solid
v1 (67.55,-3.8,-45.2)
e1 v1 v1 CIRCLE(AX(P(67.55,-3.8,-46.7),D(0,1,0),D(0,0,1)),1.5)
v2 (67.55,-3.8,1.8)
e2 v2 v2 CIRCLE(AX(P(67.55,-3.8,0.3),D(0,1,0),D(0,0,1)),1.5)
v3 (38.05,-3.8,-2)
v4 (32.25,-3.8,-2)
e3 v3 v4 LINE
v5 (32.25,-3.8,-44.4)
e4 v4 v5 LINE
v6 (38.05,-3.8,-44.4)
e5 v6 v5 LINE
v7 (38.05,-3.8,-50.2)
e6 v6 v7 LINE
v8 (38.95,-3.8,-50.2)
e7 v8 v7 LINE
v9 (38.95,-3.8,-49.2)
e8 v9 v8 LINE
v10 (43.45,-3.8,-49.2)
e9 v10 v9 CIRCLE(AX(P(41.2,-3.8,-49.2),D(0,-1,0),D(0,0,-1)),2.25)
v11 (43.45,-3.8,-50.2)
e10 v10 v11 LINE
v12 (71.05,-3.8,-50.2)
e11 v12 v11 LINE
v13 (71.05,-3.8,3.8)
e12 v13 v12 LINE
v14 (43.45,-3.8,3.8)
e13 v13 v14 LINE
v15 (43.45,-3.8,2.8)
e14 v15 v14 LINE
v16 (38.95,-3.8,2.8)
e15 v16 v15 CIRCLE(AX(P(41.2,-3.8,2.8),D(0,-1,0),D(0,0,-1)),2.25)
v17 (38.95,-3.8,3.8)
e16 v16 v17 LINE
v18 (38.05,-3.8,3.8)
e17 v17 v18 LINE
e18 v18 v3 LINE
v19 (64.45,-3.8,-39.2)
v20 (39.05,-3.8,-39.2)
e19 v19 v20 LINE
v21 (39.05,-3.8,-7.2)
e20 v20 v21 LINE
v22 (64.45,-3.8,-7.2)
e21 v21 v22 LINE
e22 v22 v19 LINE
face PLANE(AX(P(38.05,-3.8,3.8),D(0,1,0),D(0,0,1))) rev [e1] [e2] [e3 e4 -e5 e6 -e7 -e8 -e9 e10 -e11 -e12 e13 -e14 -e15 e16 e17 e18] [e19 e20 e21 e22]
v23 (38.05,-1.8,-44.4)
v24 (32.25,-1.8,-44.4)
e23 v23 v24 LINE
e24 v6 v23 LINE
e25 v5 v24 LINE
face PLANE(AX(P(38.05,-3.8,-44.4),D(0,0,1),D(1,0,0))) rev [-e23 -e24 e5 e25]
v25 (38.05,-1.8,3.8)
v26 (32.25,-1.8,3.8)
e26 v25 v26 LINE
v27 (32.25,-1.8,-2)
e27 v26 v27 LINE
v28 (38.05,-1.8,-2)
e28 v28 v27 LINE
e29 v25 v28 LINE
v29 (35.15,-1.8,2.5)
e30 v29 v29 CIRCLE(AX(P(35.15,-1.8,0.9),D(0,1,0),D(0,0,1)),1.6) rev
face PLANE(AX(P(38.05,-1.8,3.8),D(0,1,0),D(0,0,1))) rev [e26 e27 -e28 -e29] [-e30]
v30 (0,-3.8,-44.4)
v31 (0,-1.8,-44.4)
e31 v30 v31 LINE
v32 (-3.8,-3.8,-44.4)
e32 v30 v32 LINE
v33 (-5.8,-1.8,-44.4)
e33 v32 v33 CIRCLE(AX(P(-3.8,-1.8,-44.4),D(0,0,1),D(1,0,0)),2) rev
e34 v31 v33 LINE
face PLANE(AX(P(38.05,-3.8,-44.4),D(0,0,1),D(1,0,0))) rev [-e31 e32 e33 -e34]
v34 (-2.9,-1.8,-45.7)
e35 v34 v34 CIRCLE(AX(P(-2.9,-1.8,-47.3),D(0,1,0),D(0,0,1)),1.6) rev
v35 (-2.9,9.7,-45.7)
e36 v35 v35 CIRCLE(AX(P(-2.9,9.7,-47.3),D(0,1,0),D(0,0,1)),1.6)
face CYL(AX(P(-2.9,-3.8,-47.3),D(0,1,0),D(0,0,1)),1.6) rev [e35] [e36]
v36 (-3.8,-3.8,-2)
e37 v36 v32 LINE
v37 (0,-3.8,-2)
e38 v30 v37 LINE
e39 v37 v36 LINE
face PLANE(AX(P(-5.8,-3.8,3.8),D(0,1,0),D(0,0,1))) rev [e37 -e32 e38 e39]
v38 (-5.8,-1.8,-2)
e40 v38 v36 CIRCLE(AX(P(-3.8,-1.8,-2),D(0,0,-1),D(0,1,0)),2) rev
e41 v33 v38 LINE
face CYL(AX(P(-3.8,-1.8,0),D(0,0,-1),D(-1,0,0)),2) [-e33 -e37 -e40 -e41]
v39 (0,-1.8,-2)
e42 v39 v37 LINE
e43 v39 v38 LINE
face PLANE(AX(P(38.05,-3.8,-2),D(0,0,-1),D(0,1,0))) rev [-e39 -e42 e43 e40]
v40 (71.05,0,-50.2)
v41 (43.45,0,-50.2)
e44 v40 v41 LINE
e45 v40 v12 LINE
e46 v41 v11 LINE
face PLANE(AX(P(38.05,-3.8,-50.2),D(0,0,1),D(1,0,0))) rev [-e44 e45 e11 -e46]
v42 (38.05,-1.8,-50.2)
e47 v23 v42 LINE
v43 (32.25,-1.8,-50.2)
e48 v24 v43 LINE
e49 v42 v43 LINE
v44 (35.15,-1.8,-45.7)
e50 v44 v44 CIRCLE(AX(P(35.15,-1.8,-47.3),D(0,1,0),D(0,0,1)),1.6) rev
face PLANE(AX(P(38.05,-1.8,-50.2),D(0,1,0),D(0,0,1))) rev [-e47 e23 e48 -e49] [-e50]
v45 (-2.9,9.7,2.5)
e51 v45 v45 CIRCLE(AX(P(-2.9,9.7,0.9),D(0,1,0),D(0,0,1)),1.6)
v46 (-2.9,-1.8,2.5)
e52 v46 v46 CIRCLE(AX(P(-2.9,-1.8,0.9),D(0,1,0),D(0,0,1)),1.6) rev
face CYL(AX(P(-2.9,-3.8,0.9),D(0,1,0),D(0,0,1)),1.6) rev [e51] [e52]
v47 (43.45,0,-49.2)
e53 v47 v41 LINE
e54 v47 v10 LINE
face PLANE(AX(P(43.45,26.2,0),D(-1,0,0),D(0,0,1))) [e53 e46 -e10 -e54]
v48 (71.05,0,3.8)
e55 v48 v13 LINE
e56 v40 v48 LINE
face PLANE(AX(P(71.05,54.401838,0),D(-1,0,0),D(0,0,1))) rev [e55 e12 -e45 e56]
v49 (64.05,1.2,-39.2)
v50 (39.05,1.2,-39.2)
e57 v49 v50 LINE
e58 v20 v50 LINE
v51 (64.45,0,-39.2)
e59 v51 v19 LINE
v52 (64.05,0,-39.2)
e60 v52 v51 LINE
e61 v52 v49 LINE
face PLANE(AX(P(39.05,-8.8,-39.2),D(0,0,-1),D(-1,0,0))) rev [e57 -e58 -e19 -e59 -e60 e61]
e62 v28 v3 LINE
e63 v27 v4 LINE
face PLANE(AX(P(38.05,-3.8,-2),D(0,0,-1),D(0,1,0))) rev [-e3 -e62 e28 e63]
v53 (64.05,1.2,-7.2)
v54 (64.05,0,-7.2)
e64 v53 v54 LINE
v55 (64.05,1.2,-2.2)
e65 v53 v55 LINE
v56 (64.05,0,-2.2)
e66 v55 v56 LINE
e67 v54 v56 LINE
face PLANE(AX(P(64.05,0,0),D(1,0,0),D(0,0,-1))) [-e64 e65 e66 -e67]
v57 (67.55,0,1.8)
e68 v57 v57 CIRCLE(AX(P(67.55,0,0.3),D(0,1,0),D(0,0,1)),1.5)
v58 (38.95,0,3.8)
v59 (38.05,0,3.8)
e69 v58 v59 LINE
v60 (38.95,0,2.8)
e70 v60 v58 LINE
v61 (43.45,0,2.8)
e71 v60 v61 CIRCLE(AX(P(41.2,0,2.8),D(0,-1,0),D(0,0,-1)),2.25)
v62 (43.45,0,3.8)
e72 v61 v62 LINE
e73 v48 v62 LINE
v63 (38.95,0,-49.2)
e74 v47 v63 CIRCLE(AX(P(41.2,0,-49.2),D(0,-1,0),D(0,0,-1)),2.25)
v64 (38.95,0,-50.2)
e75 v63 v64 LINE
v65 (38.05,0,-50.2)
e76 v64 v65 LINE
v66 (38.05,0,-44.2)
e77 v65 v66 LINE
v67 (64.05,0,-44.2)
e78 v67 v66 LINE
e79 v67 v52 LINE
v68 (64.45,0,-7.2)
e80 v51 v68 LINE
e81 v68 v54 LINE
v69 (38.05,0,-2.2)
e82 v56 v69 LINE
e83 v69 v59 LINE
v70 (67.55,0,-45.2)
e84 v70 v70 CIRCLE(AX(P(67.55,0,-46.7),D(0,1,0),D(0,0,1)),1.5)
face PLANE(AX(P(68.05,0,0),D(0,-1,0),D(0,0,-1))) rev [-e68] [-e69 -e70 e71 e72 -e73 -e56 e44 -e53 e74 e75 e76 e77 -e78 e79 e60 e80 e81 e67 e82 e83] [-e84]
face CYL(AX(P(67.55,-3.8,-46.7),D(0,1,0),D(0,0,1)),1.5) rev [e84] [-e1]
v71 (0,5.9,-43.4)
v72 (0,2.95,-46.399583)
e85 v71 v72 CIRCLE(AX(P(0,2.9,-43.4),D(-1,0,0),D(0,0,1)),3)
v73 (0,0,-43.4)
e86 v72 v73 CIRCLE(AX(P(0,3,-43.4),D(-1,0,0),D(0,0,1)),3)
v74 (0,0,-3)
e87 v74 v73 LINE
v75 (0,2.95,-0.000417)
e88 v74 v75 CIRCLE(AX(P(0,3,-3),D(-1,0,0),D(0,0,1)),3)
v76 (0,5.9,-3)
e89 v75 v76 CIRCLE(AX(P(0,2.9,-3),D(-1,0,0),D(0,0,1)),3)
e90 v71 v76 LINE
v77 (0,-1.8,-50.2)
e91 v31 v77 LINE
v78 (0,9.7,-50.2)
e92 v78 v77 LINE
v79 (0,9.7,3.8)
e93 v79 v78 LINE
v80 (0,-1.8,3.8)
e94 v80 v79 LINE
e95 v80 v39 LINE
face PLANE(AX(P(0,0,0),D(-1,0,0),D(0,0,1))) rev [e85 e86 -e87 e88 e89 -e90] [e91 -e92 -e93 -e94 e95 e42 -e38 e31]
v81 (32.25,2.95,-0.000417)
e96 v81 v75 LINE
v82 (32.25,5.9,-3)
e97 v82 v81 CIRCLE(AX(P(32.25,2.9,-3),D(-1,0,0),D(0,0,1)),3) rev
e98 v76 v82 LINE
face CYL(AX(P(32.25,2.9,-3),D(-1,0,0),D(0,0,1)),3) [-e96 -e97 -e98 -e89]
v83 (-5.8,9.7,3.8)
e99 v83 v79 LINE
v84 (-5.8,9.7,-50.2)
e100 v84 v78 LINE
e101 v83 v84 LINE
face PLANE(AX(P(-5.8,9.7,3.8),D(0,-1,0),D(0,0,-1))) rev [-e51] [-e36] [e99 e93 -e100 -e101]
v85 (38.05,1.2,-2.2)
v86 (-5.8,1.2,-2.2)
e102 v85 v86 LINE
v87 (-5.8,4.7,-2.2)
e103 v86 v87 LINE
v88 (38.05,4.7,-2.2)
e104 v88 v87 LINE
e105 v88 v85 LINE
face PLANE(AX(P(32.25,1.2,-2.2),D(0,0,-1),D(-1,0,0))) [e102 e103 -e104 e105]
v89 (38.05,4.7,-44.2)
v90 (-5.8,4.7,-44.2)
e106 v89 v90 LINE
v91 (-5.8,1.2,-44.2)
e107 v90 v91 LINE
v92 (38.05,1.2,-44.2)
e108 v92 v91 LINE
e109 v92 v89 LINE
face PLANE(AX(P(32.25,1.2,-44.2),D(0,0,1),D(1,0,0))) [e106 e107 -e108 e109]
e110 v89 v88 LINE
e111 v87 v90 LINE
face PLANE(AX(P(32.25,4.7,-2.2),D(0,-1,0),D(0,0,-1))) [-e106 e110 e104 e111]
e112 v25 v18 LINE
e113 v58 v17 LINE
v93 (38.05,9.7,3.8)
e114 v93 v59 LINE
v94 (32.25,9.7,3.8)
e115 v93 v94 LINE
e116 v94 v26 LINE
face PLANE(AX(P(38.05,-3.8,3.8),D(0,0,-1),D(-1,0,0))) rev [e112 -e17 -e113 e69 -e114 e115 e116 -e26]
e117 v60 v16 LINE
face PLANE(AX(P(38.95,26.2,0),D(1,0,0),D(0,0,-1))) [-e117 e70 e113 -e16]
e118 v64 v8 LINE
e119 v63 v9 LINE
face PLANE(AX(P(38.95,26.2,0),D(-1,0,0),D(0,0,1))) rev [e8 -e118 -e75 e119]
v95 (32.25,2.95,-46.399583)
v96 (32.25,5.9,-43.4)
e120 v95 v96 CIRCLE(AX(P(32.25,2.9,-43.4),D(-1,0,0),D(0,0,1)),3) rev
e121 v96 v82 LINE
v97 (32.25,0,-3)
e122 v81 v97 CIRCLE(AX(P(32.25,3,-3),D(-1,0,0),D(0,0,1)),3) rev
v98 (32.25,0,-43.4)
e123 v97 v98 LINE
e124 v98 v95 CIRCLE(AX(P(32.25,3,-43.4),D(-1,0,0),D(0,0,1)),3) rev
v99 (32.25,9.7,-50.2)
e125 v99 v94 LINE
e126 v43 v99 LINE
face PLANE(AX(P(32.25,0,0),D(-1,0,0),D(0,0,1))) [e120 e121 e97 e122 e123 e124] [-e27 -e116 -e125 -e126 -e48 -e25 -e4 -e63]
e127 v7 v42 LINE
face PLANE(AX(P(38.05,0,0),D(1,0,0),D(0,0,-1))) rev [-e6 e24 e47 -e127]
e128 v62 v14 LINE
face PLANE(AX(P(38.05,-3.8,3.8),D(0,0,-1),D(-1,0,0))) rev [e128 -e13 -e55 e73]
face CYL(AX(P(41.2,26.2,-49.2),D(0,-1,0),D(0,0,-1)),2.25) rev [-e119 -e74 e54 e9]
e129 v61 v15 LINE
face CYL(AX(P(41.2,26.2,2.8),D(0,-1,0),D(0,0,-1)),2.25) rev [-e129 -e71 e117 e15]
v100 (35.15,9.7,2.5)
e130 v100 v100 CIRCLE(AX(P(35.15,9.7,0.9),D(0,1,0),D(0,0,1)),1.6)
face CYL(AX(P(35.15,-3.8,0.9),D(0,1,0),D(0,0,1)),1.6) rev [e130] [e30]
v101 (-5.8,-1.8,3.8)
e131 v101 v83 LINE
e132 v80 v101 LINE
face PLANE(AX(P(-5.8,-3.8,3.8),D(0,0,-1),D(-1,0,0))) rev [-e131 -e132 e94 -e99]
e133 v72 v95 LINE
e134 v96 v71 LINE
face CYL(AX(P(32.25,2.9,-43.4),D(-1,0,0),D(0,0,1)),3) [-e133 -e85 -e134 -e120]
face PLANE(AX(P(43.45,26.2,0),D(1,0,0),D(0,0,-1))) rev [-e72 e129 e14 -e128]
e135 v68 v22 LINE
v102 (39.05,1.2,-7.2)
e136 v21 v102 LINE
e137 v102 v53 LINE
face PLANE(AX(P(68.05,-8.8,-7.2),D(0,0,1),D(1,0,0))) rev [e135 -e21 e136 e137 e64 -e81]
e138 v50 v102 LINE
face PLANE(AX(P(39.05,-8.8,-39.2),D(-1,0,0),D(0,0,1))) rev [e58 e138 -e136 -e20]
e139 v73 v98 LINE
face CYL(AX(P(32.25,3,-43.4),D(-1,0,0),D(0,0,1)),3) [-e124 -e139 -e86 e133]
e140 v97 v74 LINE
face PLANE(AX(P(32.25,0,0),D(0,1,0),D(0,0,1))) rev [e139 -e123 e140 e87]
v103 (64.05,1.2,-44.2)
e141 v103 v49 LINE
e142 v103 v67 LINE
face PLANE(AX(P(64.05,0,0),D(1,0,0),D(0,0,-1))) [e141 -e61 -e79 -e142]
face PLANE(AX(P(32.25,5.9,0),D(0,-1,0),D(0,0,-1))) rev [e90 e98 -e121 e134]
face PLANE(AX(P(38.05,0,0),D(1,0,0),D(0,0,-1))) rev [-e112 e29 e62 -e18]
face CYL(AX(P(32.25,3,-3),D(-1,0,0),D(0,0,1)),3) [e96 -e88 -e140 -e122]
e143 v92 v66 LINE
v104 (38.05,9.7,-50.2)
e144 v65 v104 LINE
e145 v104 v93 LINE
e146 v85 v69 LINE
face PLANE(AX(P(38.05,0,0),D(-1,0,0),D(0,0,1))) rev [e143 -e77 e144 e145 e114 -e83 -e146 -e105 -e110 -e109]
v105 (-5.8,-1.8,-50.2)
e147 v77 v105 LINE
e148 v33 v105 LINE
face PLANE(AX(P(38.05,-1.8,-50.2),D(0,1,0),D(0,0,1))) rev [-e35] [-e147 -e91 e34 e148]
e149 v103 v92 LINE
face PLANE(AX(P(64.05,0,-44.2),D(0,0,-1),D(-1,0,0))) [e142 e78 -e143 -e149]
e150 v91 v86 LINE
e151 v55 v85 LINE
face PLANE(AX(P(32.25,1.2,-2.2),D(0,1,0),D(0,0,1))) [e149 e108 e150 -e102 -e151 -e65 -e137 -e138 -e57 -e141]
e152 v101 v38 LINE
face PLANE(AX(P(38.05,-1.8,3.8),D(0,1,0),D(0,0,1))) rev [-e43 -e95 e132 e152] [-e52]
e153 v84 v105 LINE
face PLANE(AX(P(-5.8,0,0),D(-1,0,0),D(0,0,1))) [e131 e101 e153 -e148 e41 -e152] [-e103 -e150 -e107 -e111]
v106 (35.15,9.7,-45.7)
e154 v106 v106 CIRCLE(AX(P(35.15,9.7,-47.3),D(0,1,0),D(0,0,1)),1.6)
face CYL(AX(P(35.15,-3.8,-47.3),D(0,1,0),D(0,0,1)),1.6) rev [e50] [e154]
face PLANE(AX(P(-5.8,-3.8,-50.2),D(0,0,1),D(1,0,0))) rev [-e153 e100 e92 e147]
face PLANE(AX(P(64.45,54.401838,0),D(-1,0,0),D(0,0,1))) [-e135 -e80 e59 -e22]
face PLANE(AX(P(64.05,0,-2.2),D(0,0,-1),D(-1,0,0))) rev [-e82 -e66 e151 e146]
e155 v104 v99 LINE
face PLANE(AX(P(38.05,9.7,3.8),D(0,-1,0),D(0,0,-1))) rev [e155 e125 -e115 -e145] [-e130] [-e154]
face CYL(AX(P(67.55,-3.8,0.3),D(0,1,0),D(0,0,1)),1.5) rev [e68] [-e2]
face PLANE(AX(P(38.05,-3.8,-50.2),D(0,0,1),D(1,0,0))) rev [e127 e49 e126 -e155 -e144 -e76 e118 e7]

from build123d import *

# Parameters (mm, degrees)
SKETCH1_W           = 46.4
SKETCH1_H           = 5.9
SKETCH1_W_2         = 42
SKETCH1_H_2         = 3.5
BOSS_EXTRUDE1_DEPTH = 32.25
FILLET2_R           = 3
SKETCH2_W           = 54
SKETCH2_H           = 13.5
SKETCH2_W_2         = 42
SKETCH2_H_2         = 3.5
BOSS_EXTRUDE2_DEPTH = 5.8
SKETCH3_W           = 54
SKETCH3_H           = 13.5
SKETCH3_W_2         = 42
SKETCH3_H_2         = 3.5
BOSS_EXTRUDE3_DEPTH = 5.8
SKETCH4_R           = 1.6
CUT_EXTRUDE1_DEPTH  = 65.421211569
SKETCH15_W          = 42
SKETCH15_H          = 3.5
SKETCH15_W_2        = 5.8
SKETCH15_H_2        = 2
CUT_EXTRUDE5_DEPTH  = 68.356903878
FILLET3_R           = 2
SKETCH16_W          = 42
SKETCH16_H          = 1.2
BOSS_EXTRUDE4_DEPTH = 26
SKETCH16_3_W        = 5.8
SKETCH16_3_H        = 2
BOSS_EXTRUDE5_DEPTH = 30
SKETCH17_W          = 29
SKETCH17_H          = 32
CUT_EXTRUDE6_DEPTH  = 10
CUT_EXTRUDE7_DEPTH  = 30
SKETCH19_W          = 3.6
SKETCH19_H          = 32
BOSS_EXTRUDE6_DEPTH = 3.8
SKETCH20_R          = 1.5
CUT_EXTRUDE8_DEPTH  = 88.534179039


with BuildPart() as part:
    # Sketch1 → Boss-Extrude1 (new body)
    with BuildSketch(Plane(origin=(0, 0, 0), x_dir=(0, 0, -1), z_dir=(1, 0, 0))):
        with Locations((23.2, 2.95)):
            Rectangle(SKETCH1_W, SKETCH1_H)
        with Locations((23.2, 2.95)):
            Rectangle(SKETCH1_W_2, SKETCH1_H_2, mode=Mode.SUBTRACT)
    extrude(amount=BOSS_EXTRUDE1_DEPTH)

    # Fillet2
    # the kernel refuses this fillet: 3 mm, written as the material it takes off along each edge
    with BuildSketch(Plane(origin=(-7.5, 0, -46.4), x_dir=(0, 0, 1), z_dir=(1, 0, 0)), Plane(origin=(-7.5, 5.9, 0), x_dir=(0, 0, -1), z_dir=(1, 0, 0)), Plane(origin=(-7.5, 5.9, -46.4), x_dir=(0, -1, 0), z_dir=(1, 0, 0))) as fillet2_piece_1:
        with BuildLine():
            CenterArc((FILLET2_R, -FILLET2_R), FILLET2_R, 90, 90)
            Line((0, -FILLET2_R), (0, 0))
            Line((0, 0), (FILLET2_R, 0))
        make_face()
    extrude(amount=47.25, mode=Mode.SUBTRACT)
    with BuildSketch(Plane(origin=(-7.5, 0, 0), x_dir=(0, 0, -1), z_dir=(1, 0, 0))) as fillet2_piece_2:
        with BuildLine():
            CenterArc((FILLET2_R, FILLET2_R), FILLET2_R, 180, 90)
            Line((0, FILLET2_R), (0, 0))
            Line((0, 0), (FILLET2_R, 0))
        make_face()
    extrude(amount=47.25, mode=Mode.SUBTRACT)

    # Sketch2 → Boss-Extrude2 (add)
    with BuildSketch(Plane(origin=(32.25, 0, 0), x_dir=(0, 0, -1), z_dir=(1, 0, 0))):
        with Locations((23.2, 2.95)):
            Rectangle(SKETCH2_W, SKETCH2_H)
        with Locations((23.2, 2.95)):
            Rectangle(SKETCH2_W_2, SKETCH2_H_2, mode=Mode.SUBTRACT)
    extrude(amount=BOSS_EXTRUDE2_DEPTH)

    # Sketch3 → Boss-Extrude3 (add)
    with BuildSketch(Plane.ZY):
        with Locations((-23.2, 2.95)):
            Rectangle(SKETCH3_W, SKETCH3_H)
        with Locations((-23.2, 2.95)):
            Rectangle(SKETCH3_W_2, SKETCH3_H_2, mode=Mode.SUBTRACT)
    extrude(amount=BOSS_EXTRUDE3_DEPTH)

    # Sketch4 → Cut-Extrude1 (cut, through all)
    with BuildSketch(Plane(origin=(0, 9.7, 0), x_dir=(1, 0, 0), z_dir=(0, 1, 0))):
        with Locations(Location((-2.9, 47.3, 0), (0, 0, 270))):
            Circle(SKETCH4_R)
        with Locations(Location((35.15, 47.3, 0), (0, 0, 270))):
            Circle(SKETCH4_R)
        with Locations(Location((-2.9, -0.9, 0), (0, 0, 270))):
            Circle(SKETCH4_R)
        with Locations(Location((35.15, -0.9, 0), (0, 0, 270))):
            Circle(SKETCH4_R)
    extrude(amount=-CUT_EXTRUDE1_DEPTH, mode=Mode.SUBTRACT)

    # Sketch15 → Cut-Extrude5 (cut, through all)
    with BuildSketch(Plane.ZY.offset(5.8)):
        with Locations((-23.2, 2.95)):
            Rectangle(SKETCH15_W, SKETCH15_H)
        with Locations((-47.3, -2.8)):
            Rectangle(SKETCH15_W_2, SKETCH15_H_2)
        with Locations((0.9, -2.8)):
            Rectangle(SKETCH15_W_2, SKETCH15_H_2)
    extrude(amount=-CUT_EXTRUDE5_DEPTH, mode=Mode.SUBTRACT)

    # Fillet3
    fillet3_edges = [part.edges().sort_by_distance(p)[0] for p in [
        (-5.8, -3.8, -23.2),
    ]]
    fillet(fillet3_edges, radius=FILLET3_R)

    # Sketch16 → Boss-Extrude4 (add)
    with BuildSketch(Plane(origin=(38.05, 0, 0), x_dir=(0, 0, -1), z_dir=(1, 0, 0))):
        with Locations((23.2, 0.6)):
            Rectangle(SKETCH16_W, SKETCH16_H)
    extrude(amount=BOSS_EXTRUDE4_DEPTH)

    # Sketch16<3> → Boss-Extrude5 (add)
    with BuildSketch(Plane(origin=(38.05, 0, 0), x_dir=(0, 0, -1), z_dir=(1, 0, 0))):
        Polygon((2, -1.8), (2, -3.8), (44.4, -3.8), (44.4, -1.8), (50.2, -1.8), (50.2, 0), (44.2, 0), (2.2, 0), (-3.8, 0), (-3.8, -1.8), align=None)
        with Locations((-0.9, -2.8)):
            Rectangle(SKETCH16_3_W, SKETCH16_3_H)
        with Locations((47.3, -2.8)):
            Rectangle(SKETCH16_3_W, SKETCH16_3_H)
    extrude(amount=BOSS_EXTRUDE5_DEPTH)

    # Sketch17 → Cut-Extrude6 (cut)
    with BuildSketch(Plane(origin=(0, 1.2, 0), x_dir=(1, 0, 0), z_dir=(0, 1, 0))):
        with Locations((53.55, 23.2)):
            Rectangle(SKETCH17_W, SKETCH17_H)
    extrude(amount=-CUT_EXTRUDE6_DEPTH, mode=Mode.SUBTRACT)

    # Sketch18 → Cut-Extrude7 (cut)
    with BuildSketch(Plane.XZ.offset(3.8)):
        with BuildLine():
            ThreePointArc((39.184435563, 3.8), (39.00939278, 3.313556237), (38.95, 2.8))
            ThreePointArc((38.95, 2.8), (41.2, 0.55), (43.45, 2.8))
            ThreePointArc((43.45, 2.8), (43.39060722, 3.313556237), (43.215564437, 3.8))
            Line((43.215564437, 3.8), (39.184435563, 3.8))
        make_face()
        with BuildLine():
            ThreePointArc((43.215564437, 3.8), (41.2, 5.05), (39.184435563, 3.8))
            Line((39.184435563, 3.8), (43.215564437, 3.8))
        make_face()
        with BuildLine():
            Line((38.95, 3.8), (38.95, 2.8))
            ThreePointArc((38.95, 2.8), (39.00939278, 3.313556237), (39.184435563, 3.8))
            Line((39.184435563, 3.8), (38.95, 3.8))
        make_face()
        with BuildLine():
            ThreePointArc((43.215564437, 3.8), (43.39060722, 3.313556237), (43.45, 2.8))
            Line((43.45, 2.8), (43.45, 3.8))
            Line((43.45, 3.8), (43.215564437, 3.8))
        make_face()
        with BuildLine():
            ThreePointArc((43.45, -49.2), (41.2, -46.95), (38.95, -49.2))
            ThreePointArc((38.95, -49.2), (39.00939278, -49.713556237), (39.184435563, -50.2))
            Line((39.184435563, -50.2), (43.215564437, -50.2))
            ThreePointArc((43.215564437, -50.2), (43.39060722, -49.713556237), (43.45, -49.2))
        make_face()
        with BuildLine():
            Line((43.215564437, -50.2), (39.184435563, -50.2))
            ThreePointArc((39.184435563, -50.2), (41.2, -51.45), (43.215564437, -50.2))
        make_face()
        with BuildLine():
            ThreePointArc((39.184435563, -50.2), (39.00939278, -49.713556237), (38.95, -49.2))
            Line((38.95, -49.2), (38.95, -50.2))
            Line((38.95, -50.2), (39.184435563, -50.2))
        make_face()
        with BuildLine():
            Line((43.45, -50.2), (43.45, -49.2))
            ThreePointArc((43.45, -49.2), (43.39060722, -49.713556237), (43.215564437, -50.2))
            Line((43.215564437, -50.2), (43.45, -50.2))
        make_face()
    extrude(amount=-CUT_EXTRUDE7_DEPTH, mode=Mode.SUBTRACT)

    # Sketch19 → Boss-Extrude6 (add)
    with BuildSketch(Plane.XZ.offset(3.8)):
        with Locations((66.25, -23.2)):
            Rectangle(SKETCH19_W, SKETCH19_H)
        Polygon((71.05, 3.8), (68.05, 3.8), (68.05, -7.2), (68.05, -39.2), (68.05, -50.2), (71.05, -50.2), align=None)
    extrude(amount=-BOSS_EXTRUDE6_DEPTH)

    # Sketch20 → Cut-Extrude8 (cut, through all)
    with BuildSketch(Plane(origin=(0, 0, 0), x_dir=(1, 0, 0), z_dir=(0, 1, 0))):
        with Locations(Location((67.55, -0.3, 0), (0, 0, 270))):
            Circle(SKETCH20_R)
        with Locations(Location((67.55, 46.7, 0), (0, 0, 270))):
            Circle(SKETCH20_R)
    extrude(amount=-CUT_EXTRUDE8_DEPTH, mode=Mode.SUBTRACT)


solid = part.part
